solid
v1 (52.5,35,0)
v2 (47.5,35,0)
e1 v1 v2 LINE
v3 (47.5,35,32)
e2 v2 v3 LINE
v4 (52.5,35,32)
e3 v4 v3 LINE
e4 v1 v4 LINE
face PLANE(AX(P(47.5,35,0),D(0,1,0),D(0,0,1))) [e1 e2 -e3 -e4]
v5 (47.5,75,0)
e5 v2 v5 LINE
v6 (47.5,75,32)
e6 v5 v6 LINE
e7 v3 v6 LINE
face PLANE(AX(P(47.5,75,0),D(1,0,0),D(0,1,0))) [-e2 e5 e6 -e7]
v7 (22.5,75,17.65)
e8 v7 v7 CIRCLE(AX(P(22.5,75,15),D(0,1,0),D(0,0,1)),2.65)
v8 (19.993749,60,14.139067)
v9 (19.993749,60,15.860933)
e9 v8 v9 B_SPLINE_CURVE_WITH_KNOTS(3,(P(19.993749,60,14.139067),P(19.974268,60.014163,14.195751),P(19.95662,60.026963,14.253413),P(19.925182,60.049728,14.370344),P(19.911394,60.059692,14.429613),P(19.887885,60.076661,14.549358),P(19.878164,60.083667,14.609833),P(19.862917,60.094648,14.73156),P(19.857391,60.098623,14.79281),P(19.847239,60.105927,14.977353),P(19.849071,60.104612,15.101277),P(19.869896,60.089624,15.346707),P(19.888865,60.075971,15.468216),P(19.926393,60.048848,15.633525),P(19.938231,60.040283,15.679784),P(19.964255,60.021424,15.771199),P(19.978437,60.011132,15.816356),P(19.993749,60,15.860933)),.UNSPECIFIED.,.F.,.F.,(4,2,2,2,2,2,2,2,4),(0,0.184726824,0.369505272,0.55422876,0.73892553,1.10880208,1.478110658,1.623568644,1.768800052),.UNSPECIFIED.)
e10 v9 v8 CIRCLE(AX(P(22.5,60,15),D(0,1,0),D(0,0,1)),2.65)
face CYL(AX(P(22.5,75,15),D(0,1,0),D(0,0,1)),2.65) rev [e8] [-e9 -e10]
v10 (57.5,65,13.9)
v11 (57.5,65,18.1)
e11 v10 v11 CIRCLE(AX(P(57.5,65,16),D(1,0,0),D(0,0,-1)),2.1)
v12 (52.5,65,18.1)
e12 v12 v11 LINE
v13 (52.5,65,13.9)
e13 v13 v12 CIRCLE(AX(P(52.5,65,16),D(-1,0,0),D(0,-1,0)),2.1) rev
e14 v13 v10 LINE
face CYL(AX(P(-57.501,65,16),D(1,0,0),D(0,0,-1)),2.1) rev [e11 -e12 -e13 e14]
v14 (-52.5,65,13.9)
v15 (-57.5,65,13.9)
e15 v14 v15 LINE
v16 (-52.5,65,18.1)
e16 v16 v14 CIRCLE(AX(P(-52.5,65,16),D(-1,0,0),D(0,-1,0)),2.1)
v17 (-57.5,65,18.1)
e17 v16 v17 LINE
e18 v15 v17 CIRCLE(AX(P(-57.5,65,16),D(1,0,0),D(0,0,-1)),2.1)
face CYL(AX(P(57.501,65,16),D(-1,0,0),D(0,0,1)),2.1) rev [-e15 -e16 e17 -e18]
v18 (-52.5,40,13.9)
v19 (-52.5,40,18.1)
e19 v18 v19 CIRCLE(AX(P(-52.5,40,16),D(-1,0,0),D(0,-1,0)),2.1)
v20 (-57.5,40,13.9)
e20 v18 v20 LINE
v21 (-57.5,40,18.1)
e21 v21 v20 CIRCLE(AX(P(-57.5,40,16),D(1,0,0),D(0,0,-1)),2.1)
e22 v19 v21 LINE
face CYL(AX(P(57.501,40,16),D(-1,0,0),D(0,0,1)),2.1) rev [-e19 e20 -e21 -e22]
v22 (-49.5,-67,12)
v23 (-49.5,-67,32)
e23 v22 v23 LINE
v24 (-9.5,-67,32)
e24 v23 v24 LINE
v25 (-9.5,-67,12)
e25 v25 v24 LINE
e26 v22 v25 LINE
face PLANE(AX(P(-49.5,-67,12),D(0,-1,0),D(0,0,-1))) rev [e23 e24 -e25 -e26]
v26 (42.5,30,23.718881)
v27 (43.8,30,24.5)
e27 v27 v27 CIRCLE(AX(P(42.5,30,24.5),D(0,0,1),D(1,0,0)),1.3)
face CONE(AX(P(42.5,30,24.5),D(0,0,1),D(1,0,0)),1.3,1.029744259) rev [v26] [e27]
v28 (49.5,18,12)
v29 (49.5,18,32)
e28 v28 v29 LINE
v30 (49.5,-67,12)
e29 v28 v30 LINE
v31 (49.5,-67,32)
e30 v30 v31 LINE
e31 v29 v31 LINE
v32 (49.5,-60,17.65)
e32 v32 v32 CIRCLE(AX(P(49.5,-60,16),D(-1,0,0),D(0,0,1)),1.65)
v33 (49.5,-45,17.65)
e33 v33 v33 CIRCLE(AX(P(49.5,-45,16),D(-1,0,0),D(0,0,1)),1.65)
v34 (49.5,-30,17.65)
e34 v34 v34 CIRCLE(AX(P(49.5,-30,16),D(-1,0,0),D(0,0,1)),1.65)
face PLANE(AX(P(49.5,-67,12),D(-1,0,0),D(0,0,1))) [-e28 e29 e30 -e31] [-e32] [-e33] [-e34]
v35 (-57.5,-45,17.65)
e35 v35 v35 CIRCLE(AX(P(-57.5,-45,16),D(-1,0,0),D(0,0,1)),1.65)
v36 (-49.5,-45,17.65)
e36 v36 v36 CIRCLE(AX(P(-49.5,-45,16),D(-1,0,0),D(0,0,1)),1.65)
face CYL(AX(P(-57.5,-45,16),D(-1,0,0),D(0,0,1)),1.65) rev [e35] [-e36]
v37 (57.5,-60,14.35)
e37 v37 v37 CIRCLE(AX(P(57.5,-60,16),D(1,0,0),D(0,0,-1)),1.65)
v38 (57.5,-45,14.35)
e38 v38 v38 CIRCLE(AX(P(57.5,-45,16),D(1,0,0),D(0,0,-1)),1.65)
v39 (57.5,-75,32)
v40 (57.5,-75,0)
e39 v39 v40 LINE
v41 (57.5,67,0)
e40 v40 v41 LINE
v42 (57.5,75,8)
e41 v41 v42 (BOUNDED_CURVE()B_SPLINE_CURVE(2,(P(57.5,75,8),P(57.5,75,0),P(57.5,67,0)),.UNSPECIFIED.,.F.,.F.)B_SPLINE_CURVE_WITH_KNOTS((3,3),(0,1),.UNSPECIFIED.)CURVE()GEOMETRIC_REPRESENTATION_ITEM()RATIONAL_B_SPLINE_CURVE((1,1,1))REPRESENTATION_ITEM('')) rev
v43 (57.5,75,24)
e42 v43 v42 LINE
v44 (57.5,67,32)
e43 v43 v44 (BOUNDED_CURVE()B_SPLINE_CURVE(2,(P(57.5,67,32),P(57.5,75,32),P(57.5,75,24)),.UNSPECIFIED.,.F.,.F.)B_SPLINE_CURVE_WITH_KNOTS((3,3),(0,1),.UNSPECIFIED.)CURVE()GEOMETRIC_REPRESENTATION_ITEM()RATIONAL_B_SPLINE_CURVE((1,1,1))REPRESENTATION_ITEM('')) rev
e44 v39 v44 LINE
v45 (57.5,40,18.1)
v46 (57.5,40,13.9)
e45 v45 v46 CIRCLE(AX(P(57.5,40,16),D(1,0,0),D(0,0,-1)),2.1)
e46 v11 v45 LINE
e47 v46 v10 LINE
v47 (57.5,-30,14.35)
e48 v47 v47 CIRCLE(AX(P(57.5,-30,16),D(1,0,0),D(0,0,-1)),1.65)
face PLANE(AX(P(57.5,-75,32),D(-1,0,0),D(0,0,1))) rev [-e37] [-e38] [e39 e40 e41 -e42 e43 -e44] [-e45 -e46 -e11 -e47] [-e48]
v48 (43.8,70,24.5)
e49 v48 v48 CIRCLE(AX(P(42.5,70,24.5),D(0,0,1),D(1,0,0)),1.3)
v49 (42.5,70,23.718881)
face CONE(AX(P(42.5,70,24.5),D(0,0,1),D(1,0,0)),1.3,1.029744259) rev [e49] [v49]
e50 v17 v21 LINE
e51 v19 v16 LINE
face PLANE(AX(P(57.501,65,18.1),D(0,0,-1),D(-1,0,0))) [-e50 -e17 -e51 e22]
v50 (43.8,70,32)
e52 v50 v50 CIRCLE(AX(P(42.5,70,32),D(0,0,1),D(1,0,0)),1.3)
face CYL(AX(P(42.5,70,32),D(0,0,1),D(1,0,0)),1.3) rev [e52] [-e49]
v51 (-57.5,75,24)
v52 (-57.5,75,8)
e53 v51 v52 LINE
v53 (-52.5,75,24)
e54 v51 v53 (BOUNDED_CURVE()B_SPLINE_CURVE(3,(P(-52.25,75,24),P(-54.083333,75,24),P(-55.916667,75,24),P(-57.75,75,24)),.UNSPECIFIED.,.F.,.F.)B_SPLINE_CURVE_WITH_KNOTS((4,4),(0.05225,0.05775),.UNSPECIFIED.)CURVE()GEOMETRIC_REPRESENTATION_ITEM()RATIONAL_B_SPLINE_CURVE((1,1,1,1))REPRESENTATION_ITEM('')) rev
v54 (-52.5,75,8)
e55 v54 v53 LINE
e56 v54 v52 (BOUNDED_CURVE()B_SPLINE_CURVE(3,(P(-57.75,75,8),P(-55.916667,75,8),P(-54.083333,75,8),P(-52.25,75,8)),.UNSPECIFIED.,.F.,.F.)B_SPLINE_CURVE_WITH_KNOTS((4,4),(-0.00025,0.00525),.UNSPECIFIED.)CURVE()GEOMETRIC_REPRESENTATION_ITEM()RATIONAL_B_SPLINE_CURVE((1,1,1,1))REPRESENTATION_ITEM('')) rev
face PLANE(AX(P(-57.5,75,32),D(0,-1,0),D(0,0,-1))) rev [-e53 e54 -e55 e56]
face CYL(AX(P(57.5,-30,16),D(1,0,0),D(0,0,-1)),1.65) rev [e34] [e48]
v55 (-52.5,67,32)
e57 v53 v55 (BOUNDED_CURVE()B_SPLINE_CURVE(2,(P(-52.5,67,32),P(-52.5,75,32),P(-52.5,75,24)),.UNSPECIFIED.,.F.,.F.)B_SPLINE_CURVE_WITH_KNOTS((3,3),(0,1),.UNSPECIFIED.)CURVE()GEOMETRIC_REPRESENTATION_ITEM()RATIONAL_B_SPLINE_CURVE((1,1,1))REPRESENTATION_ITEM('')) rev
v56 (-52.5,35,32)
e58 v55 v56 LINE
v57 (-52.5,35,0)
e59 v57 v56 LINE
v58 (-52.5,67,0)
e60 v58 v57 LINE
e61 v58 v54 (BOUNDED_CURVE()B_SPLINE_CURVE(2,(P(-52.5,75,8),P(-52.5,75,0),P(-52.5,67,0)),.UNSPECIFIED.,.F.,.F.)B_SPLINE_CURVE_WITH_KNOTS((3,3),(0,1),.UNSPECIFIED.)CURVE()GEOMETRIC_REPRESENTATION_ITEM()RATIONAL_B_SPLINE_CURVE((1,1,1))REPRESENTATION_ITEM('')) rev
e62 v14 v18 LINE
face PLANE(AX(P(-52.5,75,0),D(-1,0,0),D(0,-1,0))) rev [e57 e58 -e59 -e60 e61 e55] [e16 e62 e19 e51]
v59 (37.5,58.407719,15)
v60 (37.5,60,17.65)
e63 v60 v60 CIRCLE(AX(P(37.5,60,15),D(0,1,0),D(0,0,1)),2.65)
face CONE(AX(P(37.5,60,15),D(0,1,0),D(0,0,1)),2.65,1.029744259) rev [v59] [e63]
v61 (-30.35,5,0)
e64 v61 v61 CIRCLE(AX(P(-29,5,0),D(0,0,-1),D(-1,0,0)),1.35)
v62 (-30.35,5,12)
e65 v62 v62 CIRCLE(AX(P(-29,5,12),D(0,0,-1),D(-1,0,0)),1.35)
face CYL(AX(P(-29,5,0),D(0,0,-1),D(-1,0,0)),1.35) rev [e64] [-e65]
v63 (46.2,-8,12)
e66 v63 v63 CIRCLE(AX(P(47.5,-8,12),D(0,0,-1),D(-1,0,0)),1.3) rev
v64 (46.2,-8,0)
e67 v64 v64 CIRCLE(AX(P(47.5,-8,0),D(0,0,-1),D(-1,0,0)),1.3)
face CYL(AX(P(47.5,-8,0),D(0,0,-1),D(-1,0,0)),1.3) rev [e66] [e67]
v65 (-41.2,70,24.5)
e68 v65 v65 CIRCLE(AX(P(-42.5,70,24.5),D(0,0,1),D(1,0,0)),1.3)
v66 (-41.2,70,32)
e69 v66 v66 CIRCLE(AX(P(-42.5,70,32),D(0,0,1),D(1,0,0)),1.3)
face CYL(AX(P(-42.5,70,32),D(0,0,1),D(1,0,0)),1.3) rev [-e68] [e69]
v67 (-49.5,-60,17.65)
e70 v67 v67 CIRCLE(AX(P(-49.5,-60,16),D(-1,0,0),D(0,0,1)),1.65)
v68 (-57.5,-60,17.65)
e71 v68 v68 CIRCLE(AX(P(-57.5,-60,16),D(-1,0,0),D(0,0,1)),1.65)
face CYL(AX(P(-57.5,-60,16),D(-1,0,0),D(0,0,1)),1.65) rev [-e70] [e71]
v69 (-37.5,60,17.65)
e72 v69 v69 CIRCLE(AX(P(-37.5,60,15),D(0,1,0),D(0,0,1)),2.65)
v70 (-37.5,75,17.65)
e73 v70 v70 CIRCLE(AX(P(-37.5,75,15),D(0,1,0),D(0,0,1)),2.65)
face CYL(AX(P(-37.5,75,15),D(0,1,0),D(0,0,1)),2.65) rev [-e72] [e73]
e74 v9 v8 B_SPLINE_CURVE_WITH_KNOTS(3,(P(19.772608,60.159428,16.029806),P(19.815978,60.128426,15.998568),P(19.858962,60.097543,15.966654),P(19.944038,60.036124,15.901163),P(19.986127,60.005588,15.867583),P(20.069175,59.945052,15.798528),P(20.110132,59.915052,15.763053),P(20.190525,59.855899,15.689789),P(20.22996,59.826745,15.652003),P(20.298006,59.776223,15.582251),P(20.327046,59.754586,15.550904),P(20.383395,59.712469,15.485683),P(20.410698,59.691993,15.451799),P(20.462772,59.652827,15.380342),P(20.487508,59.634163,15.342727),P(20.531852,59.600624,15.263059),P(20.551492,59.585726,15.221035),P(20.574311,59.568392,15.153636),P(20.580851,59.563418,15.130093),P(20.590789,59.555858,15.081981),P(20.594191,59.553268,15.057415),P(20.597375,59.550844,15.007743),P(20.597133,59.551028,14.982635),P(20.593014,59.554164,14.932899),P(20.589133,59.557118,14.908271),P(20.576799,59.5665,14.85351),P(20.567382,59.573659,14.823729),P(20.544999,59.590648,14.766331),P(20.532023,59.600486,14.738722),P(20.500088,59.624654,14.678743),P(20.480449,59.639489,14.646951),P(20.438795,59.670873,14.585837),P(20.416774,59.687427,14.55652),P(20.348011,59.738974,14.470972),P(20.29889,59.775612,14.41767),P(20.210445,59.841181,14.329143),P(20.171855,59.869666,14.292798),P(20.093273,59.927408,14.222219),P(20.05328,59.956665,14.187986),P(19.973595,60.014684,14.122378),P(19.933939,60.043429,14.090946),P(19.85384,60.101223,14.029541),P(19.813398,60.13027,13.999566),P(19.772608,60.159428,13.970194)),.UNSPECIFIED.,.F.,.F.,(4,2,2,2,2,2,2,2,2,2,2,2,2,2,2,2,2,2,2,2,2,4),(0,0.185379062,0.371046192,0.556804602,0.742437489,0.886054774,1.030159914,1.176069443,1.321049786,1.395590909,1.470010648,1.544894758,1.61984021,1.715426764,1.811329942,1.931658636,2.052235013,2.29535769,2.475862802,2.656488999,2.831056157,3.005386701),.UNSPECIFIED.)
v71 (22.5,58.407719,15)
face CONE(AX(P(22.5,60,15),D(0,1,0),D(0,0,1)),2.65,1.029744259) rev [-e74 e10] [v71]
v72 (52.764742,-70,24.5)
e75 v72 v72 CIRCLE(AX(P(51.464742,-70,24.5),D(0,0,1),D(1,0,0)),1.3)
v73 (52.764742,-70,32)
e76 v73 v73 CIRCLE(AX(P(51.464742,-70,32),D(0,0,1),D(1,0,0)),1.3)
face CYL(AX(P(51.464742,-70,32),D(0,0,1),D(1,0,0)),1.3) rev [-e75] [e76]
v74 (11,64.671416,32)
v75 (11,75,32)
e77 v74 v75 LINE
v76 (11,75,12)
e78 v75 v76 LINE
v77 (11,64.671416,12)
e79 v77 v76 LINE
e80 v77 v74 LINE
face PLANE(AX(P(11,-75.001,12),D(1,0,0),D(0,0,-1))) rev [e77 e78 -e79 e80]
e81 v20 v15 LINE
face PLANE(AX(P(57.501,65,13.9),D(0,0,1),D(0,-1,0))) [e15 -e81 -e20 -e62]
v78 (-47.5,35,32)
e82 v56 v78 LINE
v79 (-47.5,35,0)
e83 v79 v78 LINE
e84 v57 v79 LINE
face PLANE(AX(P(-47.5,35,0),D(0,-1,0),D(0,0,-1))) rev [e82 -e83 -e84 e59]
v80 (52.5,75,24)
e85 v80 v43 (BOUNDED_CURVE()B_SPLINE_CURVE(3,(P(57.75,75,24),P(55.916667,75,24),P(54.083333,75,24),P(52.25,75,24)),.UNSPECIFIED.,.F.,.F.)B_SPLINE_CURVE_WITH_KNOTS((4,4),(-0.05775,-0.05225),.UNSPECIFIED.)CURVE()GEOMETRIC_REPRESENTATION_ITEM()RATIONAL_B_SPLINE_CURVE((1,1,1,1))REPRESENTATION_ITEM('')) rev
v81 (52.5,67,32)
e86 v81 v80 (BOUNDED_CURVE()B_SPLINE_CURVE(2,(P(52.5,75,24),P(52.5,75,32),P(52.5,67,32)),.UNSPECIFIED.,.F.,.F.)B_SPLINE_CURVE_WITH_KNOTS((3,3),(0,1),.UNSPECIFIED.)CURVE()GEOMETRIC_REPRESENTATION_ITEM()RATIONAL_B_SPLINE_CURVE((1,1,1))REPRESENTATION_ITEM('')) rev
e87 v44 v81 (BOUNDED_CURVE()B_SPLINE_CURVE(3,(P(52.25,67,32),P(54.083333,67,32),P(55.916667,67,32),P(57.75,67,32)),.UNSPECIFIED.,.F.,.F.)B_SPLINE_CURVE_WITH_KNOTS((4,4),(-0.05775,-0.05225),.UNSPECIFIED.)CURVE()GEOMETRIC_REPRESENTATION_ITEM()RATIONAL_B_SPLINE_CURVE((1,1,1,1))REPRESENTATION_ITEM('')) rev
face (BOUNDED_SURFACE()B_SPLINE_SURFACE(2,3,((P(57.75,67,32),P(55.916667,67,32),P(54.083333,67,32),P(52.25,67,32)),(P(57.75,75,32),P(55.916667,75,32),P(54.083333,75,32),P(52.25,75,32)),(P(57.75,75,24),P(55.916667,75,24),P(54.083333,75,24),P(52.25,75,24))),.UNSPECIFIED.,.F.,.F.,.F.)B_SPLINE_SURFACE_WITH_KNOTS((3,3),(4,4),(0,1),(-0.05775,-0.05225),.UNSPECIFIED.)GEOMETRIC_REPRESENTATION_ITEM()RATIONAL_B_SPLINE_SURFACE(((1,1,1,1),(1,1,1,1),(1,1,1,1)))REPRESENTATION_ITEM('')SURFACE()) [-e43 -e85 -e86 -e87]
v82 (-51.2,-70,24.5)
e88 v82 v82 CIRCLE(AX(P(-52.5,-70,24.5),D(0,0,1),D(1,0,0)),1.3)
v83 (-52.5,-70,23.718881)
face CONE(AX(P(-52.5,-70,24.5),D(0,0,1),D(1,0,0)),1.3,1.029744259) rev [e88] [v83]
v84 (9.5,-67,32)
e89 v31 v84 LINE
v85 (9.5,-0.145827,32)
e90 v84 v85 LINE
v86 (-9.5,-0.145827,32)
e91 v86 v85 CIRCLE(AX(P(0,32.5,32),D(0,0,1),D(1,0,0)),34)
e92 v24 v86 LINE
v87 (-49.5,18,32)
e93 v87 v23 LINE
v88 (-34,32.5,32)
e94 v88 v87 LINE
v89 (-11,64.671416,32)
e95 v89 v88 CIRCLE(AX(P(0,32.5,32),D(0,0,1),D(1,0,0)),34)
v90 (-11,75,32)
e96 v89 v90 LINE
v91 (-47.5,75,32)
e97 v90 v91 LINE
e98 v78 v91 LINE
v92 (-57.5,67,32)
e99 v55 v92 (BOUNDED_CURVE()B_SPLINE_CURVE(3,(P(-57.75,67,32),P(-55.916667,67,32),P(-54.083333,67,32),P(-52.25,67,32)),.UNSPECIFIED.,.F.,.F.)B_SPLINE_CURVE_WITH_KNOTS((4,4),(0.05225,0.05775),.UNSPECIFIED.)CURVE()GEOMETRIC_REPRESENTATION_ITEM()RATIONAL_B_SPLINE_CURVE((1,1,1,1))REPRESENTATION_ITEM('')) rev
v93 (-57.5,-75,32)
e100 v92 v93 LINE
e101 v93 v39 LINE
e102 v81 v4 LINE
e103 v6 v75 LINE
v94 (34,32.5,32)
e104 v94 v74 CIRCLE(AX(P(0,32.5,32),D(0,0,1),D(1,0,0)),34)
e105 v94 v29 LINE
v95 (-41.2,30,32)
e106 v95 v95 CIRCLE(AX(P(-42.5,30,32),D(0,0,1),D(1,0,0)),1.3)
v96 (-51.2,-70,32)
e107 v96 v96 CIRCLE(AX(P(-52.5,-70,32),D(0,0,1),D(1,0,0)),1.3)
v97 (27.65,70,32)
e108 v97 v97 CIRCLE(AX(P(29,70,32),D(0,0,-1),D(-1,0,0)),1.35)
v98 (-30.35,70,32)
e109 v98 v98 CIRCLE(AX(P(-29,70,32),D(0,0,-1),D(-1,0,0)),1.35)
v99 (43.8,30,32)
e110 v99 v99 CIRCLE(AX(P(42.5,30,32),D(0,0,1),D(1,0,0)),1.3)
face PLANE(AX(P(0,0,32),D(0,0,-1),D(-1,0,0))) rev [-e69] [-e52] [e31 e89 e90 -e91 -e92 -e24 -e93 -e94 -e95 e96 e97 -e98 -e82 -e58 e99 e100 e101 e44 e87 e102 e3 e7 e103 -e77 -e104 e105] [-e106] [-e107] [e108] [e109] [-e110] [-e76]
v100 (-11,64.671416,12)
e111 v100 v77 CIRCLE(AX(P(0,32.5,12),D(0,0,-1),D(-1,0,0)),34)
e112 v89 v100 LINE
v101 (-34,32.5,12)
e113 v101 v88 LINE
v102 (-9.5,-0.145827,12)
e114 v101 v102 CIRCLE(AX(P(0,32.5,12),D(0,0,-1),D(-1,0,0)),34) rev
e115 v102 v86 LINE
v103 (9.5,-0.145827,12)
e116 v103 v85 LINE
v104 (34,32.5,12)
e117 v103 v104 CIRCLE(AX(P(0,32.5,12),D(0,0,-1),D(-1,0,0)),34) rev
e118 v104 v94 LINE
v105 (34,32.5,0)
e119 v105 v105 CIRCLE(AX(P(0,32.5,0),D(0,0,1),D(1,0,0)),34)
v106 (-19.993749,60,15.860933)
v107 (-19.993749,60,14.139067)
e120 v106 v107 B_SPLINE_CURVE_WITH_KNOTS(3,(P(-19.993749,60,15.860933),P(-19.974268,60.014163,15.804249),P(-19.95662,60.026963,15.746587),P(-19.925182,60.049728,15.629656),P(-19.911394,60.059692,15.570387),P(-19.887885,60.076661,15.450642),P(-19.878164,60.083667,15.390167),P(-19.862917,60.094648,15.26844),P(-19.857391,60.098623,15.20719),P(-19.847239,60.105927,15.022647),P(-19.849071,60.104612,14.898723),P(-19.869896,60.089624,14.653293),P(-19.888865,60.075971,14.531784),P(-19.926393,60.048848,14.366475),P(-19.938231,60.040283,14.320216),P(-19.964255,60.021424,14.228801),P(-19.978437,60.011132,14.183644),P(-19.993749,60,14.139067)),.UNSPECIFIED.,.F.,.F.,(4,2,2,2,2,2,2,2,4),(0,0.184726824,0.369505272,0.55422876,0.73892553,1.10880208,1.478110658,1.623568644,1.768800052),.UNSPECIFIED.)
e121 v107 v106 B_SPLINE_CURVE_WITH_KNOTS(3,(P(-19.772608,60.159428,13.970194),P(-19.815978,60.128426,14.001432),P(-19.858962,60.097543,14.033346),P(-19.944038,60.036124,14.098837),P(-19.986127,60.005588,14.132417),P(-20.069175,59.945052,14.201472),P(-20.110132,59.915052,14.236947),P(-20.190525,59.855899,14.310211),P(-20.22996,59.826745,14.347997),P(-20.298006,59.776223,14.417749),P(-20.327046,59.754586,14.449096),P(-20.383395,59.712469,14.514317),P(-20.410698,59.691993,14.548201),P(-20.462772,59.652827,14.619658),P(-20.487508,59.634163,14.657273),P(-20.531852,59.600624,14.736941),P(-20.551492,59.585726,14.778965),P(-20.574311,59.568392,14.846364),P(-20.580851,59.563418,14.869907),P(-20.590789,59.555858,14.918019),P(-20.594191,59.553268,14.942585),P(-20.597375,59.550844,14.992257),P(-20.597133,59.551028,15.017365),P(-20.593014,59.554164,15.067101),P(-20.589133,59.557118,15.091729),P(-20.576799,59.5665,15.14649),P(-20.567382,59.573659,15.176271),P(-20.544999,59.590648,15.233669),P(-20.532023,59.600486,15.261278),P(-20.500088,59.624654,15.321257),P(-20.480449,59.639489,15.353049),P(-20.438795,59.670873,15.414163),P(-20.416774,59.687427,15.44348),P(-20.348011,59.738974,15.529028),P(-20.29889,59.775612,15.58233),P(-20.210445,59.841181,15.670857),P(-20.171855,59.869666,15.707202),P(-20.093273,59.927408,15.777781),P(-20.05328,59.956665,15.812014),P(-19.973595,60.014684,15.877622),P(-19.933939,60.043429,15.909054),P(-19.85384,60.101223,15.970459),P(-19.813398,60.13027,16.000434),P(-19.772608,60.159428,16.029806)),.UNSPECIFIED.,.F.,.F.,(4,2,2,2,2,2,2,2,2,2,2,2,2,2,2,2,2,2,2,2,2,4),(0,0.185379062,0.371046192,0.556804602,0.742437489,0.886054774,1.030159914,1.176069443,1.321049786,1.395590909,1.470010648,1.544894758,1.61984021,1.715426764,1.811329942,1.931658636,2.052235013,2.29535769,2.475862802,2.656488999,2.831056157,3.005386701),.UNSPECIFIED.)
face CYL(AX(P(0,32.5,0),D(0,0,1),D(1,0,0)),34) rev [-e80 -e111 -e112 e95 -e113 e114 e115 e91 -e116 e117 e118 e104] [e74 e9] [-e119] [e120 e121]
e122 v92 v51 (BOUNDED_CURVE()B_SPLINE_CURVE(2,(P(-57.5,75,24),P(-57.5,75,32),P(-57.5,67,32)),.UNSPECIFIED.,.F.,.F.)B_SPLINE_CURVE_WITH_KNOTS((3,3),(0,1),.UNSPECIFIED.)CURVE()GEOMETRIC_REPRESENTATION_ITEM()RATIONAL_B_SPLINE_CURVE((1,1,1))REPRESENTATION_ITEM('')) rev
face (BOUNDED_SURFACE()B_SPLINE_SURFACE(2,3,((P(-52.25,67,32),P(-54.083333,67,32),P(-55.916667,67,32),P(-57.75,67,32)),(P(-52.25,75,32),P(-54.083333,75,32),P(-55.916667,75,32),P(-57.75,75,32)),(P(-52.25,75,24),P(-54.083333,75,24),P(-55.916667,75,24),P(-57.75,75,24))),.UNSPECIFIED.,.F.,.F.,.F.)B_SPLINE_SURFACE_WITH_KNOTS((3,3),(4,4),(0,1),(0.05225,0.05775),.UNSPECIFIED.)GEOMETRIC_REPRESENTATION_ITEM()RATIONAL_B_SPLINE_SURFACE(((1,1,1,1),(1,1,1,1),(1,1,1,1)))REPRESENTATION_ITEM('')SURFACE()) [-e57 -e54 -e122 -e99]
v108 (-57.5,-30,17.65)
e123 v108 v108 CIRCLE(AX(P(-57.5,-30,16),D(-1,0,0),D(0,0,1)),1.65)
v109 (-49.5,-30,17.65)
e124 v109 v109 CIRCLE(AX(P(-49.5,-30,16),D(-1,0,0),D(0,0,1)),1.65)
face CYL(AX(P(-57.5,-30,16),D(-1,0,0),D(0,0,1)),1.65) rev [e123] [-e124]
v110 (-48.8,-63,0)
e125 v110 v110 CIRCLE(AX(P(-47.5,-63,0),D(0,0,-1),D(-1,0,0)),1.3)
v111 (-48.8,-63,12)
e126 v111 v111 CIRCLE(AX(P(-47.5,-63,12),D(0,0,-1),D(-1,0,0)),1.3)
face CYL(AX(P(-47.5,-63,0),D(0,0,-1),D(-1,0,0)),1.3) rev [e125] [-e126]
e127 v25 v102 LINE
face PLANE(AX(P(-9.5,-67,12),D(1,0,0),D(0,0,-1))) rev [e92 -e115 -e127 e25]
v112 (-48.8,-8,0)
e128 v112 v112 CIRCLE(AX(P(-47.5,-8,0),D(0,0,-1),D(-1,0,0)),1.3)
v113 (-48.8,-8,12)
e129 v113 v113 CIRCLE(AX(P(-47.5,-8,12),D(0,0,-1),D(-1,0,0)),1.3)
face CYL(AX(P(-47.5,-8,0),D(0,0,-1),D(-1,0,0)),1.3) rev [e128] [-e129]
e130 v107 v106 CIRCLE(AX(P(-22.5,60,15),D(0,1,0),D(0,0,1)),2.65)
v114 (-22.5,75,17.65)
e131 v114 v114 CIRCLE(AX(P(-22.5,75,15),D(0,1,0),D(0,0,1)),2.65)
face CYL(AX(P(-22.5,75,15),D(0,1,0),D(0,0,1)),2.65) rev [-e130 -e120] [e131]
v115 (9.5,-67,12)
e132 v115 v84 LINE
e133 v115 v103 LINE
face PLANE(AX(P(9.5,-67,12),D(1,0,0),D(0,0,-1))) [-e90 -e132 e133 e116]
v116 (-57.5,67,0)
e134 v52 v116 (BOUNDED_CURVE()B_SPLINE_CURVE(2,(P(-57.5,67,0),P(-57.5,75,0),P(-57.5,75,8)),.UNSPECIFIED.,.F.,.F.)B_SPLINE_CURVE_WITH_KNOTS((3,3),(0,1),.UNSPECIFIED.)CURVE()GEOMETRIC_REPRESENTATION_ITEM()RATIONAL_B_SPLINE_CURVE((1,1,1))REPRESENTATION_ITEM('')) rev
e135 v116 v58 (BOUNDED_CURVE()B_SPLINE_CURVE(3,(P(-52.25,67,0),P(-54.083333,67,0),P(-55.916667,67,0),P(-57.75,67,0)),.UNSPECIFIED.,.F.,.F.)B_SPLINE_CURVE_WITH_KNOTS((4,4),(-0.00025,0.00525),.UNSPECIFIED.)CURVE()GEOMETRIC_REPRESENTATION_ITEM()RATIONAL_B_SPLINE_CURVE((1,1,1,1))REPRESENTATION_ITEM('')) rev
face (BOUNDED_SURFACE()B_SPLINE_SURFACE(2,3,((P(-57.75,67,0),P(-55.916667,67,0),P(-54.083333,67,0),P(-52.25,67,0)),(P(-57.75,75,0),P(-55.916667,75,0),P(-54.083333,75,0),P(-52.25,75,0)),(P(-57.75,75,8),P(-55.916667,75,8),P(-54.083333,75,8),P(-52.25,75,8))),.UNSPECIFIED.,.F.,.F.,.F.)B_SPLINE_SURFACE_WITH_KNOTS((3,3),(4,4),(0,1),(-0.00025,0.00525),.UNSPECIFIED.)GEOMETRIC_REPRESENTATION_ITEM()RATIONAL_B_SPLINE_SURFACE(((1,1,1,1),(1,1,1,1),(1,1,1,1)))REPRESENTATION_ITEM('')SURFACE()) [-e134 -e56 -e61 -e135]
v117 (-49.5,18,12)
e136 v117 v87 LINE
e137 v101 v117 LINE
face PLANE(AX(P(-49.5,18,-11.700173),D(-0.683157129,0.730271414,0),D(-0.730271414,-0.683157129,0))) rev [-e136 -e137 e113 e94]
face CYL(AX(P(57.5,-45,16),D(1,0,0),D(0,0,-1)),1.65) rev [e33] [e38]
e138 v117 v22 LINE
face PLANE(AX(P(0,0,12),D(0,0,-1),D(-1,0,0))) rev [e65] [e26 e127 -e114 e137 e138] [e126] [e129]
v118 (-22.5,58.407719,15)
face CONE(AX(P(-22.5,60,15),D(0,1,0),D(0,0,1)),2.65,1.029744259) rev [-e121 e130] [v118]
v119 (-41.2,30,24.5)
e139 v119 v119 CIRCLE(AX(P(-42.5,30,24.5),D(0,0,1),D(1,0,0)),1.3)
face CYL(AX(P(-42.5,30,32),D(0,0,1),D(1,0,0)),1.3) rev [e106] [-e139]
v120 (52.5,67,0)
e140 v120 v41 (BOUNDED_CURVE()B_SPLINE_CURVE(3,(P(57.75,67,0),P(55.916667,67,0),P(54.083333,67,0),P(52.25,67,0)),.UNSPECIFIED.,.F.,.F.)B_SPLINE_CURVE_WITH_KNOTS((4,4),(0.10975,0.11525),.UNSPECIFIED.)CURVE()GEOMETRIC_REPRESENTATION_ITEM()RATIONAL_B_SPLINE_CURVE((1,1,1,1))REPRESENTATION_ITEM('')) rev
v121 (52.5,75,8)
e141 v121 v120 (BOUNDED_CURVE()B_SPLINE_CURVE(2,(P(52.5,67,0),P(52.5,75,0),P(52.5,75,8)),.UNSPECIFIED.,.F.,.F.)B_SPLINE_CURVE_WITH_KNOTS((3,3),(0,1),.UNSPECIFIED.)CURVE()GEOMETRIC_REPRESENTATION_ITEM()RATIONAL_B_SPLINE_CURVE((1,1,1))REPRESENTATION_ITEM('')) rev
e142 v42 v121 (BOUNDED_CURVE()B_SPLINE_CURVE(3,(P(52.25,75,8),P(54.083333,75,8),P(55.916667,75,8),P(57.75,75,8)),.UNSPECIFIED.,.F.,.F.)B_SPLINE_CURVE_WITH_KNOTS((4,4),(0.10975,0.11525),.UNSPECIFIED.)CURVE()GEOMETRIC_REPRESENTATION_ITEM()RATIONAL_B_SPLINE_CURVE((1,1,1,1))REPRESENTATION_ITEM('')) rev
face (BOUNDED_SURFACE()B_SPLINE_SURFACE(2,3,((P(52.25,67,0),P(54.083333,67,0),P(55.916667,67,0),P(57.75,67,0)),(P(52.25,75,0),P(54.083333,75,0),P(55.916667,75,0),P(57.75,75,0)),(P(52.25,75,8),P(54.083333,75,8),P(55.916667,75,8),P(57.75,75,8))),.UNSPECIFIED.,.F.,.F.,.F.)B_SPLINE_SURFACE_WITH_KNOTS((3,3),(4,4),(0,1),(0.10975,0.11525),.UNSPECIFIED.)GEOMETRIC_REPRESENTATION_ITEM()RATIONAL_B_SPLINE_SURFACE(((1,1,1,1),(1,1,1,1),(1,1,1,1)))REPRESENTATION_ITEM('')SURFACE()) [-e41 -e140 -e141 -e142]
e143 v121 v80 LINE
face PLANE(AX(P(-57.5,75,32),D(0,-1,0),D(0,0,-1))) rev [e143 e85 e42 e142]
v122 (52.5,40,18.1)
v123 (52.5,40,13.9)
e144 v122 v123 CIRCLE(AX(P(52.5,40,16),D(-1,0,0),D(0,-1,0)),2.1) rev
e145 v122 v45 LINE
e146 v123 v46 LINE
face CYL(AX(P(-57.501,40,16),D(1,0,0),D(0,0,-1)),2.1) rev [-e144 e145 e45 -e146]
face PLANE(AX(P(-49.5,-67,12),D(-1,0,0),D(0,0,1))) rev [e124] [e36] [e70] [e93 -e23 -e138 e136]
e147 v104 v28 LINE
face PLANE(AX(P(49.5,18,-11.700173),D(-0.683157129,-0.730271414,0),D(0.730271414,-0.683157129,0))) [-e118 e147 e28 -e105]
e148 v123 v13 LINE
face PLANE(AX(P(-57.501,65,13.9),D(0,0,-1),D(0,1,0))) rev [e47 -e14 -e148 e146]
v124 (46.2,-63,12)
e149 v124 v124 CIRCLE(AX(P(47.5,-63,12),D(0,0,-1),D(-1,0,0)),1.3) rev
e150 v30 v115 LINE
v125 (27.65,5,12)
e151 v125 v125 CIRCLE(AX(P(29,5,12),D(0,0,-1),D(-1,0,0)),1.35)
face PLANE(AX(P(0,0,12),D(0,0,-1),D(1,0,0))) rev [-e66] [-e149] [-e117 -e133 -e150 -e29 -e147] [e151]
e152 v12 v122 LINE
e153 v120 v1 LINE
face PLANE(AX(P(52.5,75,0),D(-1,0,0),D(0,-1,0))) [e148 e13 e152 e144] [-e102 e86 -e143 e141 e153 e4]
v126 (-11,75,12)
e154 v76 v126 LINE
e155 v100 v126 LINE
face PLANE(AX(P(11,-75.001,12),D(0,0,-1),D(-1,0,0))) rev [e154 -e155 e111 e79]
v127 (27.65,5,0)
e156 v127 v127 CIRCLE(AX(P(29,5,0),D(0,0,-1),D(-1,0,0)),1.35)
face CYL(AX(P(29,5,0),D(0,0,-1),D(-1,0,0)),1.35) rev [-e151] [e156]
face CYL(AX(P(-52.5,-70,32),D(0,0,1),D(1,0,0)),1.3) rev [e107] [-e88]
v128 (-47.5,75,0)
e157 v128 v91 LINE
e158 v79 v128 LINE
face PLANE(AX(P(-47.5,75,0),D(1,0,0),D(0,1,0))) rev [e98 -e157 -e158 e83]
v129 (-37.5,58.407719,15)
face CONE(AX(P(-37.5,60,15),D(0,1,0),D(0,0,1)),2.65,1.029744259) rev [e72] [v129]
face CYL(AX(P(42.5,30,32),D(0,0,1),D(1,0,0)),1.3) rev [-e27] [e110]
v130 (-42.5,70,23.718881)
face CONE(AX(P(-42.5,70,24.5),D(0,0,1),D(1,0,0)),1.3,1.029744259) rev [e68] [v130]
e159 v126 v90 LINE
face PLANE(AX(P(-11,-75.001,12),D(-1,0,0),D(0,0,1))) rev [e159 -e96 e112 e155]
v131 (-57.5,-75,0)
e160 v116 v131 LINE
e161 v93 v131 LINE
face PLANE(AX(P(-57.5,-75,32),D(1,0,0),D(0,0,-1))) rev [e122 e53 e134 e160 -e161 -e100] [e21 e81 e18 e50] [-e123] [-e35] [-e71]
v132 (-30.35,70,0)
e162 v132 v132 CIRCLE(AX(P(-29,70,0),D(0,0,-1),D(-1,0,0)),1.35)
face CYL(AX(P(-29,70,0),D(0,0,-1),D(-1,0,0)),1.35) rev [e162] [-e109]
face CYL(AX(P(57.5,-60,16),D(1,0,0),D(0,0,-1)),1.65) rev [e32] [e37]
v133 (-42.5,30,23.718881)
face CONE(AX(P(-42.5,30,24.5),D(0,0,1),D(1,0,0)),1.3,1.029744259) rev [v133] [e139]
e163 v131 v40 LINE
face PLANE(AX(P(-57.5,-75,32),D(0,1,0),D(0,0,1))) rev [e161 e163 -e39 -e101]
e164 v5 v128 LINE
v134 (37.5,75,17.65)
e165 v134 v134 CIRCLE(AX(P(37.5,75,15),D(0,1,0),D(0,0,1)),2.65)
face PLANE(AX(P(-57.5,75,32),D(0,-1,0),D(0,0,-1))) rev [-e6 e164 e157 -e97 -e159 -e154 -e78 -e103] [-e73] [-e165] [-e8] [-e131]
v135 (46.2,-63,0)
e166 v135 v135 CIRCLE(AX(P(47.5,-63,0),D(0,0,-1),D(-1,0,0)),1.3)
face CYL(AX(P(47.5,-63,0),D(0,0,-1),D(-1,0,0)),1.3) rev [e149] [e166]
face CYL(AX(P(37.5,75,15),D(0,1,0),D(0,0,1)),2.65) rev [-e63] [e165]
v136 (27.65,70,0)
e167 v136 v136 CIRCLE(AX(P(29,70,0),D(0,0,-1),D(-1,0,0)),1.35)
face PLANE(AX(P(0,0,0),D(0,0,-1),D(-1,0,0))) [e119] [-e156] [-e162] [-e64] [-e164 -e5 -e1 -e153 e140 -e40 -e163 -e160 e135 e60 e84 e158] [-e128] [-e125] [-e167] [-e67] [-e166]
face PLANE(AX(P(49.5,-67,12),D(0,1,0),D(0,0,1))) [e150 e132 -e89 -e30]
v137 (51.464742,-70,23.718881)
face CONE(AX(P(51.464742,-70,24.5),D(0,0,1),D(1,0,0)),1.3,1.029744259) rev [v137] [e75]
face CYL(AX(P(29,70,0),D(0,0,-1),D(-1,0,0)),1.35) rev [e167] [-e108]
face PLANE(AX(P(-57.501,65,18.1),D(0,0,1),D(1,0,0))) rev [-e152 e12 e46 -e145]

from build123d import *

# Parameters (mm, degrees)
SKETCH_1_W               = 115
SKETCH_1_H               = 150
EXTRUDE_1_DEPTH          = 32
SKETCH_2_R               = 34
CUT_EXTRUDE_1_DEPTH      = 100.775999118
SKETCH_3_W               = 40
SKETCH_3_H               = 85
CUT_EXTRUDE_2_DEPTH      = 20
F_1_0MM_2_D              = 2.6
SKETCH_8_W               = 5
SKETCH_8_H               = 40
CUT_EXTRUDE_3_DEPTH      = 100.775999118
CUT_EXTRUDE_4_REACH      = 165.799
CUT_EXTRUDE_4_END_RADIUS = 34
SKETCH_9_W               = 22
SKETCH_9_H               = 20
CUT_EXTRUDE_5_REACH      = 142.975
FILLET_1_SIZE            = 8
F_1_0MM_4_AT_2_COUNT     = 2
F_1_0MM_4_AT_2_PITCH     = 15
F_1_0MM_3_D              = 2.6
F_1_0MM_3_DEPTH          = 7.5
F_1_0MM_3_TIP            = 0.781118805
CUT_EXTRUDE_7_DEPTH      = 20
F_1_0MM_5_REACH          = 142.975
F_1_0MM_5_BORE_R         = 1.65
F_1_0MM_6_D              = 2.7


with BuildPart() as part:
    # 草圖1 → 填料-伸長1 (new body)
    with BuildSketch(Plane.XY):
        Rectangle(SKETCH_1_W, SKETCH_1_H)
    extrude(amount=EXTRUDE_1_DEPTH)

    # 草圖2 → 除料-伸長1 (cut, through all)
    with BuildSketch(Plane.XY.offset(32)):
        with Locations((0, 32.5)):
            Circle(SKETCH_2_R)
    extrude(amount=-CUT_EXTRUDE_1_DEPTH, mode=Mode.SUBTRACT)

    # 草圖3 → 除料-伸長2 (cut)
    with BuildSketch(Plane.XY.offset(32)):
        with Locations((-29.5, -24.5)):
            Rectangle(SKETCH_3_W, SKETCH_3_H)
    cut_extrude_2 = extrude(amount=-CUT_EXTRUDE_2_DEPTH, mode=Mode.SUBTRACT)

    # 鏡射1: 除料-伸長2 across plane
    add(cut_extrude_2.mirror(Plane(origin=(0, 0, 0), x_dir=(0, 0, 1), z_dir=(1, 0, 0))), mode=Mode.SUBTRACT)

    # Ø1.0mm 定位孔2 (through all)
    with Locations(Plane(origin=(0, 0, 0), x_dir=(-1, 0, 0), z_dir=(0, 0, -1))):
        with Locations((47.5, -8), (47.5, -63), (-47.5, -8), (-47.5, -63)):
            Hole(F_1_0MM_2_D / 2)

    # 草圖8 → 除料-伸長3 (cut, through all)
    with BuildSketch(Plane.XY.offset(32)):
        with Locations((-50, 55)):
            Rectangle(SKETCH_8_W, SKETCH_8_H)
    cut_extrude_3 = extrude(amount=-CUT_EXTRUDE_3_DEPTH, mode=Mode.SUBTRACT)

    # 鏡射2: 除料-伸長3 across plane
    add(cut_extrude_3.mirror(Plane(origin=(0, 0, 0), x_dir=(0, 0, 1), z_dir=(1, 0, 0))), mode=Mode.SUBTRACT)

    # 除料-伸長4: up to this cylinder (the profile starts outside it)
    cut_extrude_4_end = Plane(origin=(0, 32.5, 22), z_dir=(0, 0, 1)) * Cylinder(CUT_EXTRUDE_4_END_RADIUS, 400.598, mode=Mode.PRIVATE)
    # 草圖9 → 除料-伸長4 (cut, up to the surface)
    with BuildSketch(Plane(origin=(0, 75, 0), x_dir=(1, 0, 0), z_dir=(0, 1, 0)), mode=Mode.PRIVATE) as cut_extrude_4_sk1:
        with Locations((0, -22)):
            Rectangle(SKETCH_9_W, SKETCH_9_H)
    cut_extrude_4_tool1 = extrude(cut_extrude_4_sk1.sketch, amount=-CUT_EXTRUDE_4_REACH, mode=Mode.PRIVATE) - cut_extrude_4_end
    add(cut_extrude_4_tool1.solids().sort_by_distance((0, 75, 22))[0], mode=Mode.SUBTRACT)

    # 草圖11 → 除料-伸長5 (cut, up to next)
    with BuildSketch(Plane(origin=(57.5, 0, 0), x_dir=(0, 0, -1), z_dir=(1, 0, 0)), mode=Mode.PRIVATE) as cut_extrude_5_sk1:
        with BuildLine():
            Line((-13.9, 65), (-13.9, 40))
            ThreePointArc((-13.9, 40), (-16, 37.9), (-18.1, 40))
            Line((-18.1, 40), (-18.1, 65))
            ThreePointArc((-18.1, 65), (-16, 67.1), (-13.9, 65))
        make_face()
    cut_extrude_5_tool1 = extrude(cut_extrude_5_sk1.sketch, amount=-CUT_EXTRUDE_5_REACH, mode=Mode.PRIVATE) & part.part
    cut_extrude_5 = cut_extrude_5_tool1.solids().sort_by_distance((57.5, 52.5, 16))[0]
    add(cut_extrude_5, mode=Mode.SUBTRACT)

    # 鏡射3: 除料-伸長5 across plane
    add(cut_extrude_5.mirror(Plane(origin=(0, 0, 0), x_dir=(0, 0, 1), z_dir=(1, 0, 0))), mode=Mode.SUBTRACT)

    # 圓角1
    # a fillet whose section is not a circle: 8 mm, written as the material it takes off along each edge
    with BuildSketch(Plane(origin=(-32.5, 75, 32), x_dir=(0, -1, 0), z_dir=(-1, 0, 0))) as fillet_1_piece_1_section:
        with BuildLine():
            Bezier((FILLET_1_SIZE, 0), (0, 0), (0, -FILLET_1_SIZE), weights=[1, 1, 1])
            Line((0, -FILLET_1_SIZE), (0, 0))
            Line((0, 0), (FILLET_1_SIZE, 0))
        make_face()
    fillet_1_piece_1 = extrude(amount=45, mode=Mode.PRIVATE)
    fillet_1_piece_1 = split(fillet_1_piece_1, bisect_by=Plane(origin=(-47.5, 75, 32), z_dir=(-1, 0, 0)), keep=Keep.TOP, mode=Mode.PRIVATE)
    add(fillet_1_piece_1, mode=Mode.SUBTRACT)
    with BuildSketch(Plane(origin=(-32.5, 75, 0), x_dir=(0, -1, 0), z_dir=(-1, 0, 0))) as fillet_1_piece_2_section:
        with BuildLine():
            Bezier((FILLET_1_SIZE, 0), (0, 0), (0, FILLET_1_SIZE), weights=[1, 1, 1])
            Line((0, FILLET_1_SIZE), (0, 0))
            Line((0, 0), (FILLET_1_SIZE, 0))
        make_face()
    fillet_1_piece_2 = extrude(amount=45, mode=Mode.PRIVATE)
    fillet_1_piece_2 = split(fillet_1_piece_2, bisect_by=Plane(origin=(-47.5, 75, 0), z_dir=(-1, 0, 0)), keep=Keep.TOP, mode=Mode.PRIVATE)
    add(fillet_1_piece_2, mode=Mode.SUBTRACT)
    with BuildSketch(Plane(origin=(77.5, 75, 0), x_dir=(0, -1, 0), z_dir=(-1, 0, 0))) as fillet_1_piece_3:
        with BuildLine():
            Bezier((FILLET_1_SIZE, 0), (0, 0), (0, FILLET_1_SIZE), weights=[1, 1, 1])
            Line((0, FILLET_1_SIZE), (0, 0))
            Line((0, 0), (FILLET_1_SIZE, 0))
        make_face()
    extrude(amount=25, mode=Mode.SUBTRACT)
    with BuildSketch(Plane(origin=(77.5, 75, 32), x_dir=(0, -1, 0), z_dir=(-1, 0, 0))) as fillet_1_piece_4:
        with BuildLine():
            Bezier((FILLET_1_SIZE, 0), (0, 0), (0, -FILLET_1_SIZE), weights=[1, 1, 1])
            Line((0, -FILLET_1_SIZE), (0, 0))
            Line((0, 0), (FILLET_1_SIZE, 0))
        make_face()
    extrude(amount=25, mode=Mode.SUBTRACT)

    # 草圖13 → Ø1.0mm 定位孔4 (revolve, cut)
    with BuildSketch(Plane(origin=(-37.5, 75, 15), x_dir=(0, 0, 1), z_dir=(1, 0, 0))):
        Polygon((0, 0), (0, 16.59228064), (2.65, 15), (2.65, 0), align=None)
    f_1_0mm_4 = revolve(axis=Axis((-37.5, 81.35, 15), (0, -1, 0)), mode=Mode.SUBTRACT)

    # Ø1.0mm 定位孔4 at 2: Ø1.0mm 定位孔4 ×2
    with Locations(*[(i * F_1_0MM_4_AT_2_PITCH, 0, 0) for i in range(1, F_1_0MM_4_AT_2_COUNT)]):
        add(f_1_0mm_4, mode=Mode.SUBTRACT)

    # 鏡射4: Ø1.0mm 定位孔4 across plane
    add(f_1_0mm_4.mirror(Plane(origin=(0, 0, 0), x_dir=(0, 0, 1), z_dir=(1, 0, 0))), mode=Mode.SUBTRACT)

    # 鏡射4 copy 1 sketch → 鏡射4 copy 1 (revolve, cut)
    with BuildSketch(Plane(origin=(22.5, 75, 15), x_dir=(0, 0, 1), z_dir=(-1, 0, 0))):
        Polygon((0, 0), (0, -16.59228064), (2.65, -15), (2.65, 0), align=None)
    revolve(axis=Axis((22.5, 81.35, 15), (0, 1, 0)), mode=Mode.SUBTRACT)

    # Ø1.0mm 定位孔3
    with Locations(Plane.XY.offset(32)):
        with Locations((-52.5, -70), (51.464741732, -70), (-42.5, 70), (-42.5, 30), (42.5, 70), (42.5, 30)):
            Hole(F_1_0MM_3_D / 2, depth=F_1_0MM_3_DEPTH)
            with Locations((0, 0, -(F_1_0MM_3_DEPTH + F_1_0MM_3_TIP / 2))):  # 118° drill point
                Cone(0, F_1_0MM_3_D / 2, F_1_0MM_3_TIP, mode=Mode.SUBTRACT)

    # 草圖17 → 除料-伸長7 (cut)
    with BuildSketch(Plane.XY.offset(32)):
        with BuildLine():
            Line((-49.5, 18), (-34, 32.5))
            ThreePointArc((-34, 32.5), (-33.178333694, 25.070452685), (-30.753048629, 18))
            Line((-30.753048629, 18), (-49.5, 18))
        make_face()
    cut_extrude_7 = extrude(amount=-CUT_EXTRUDE_7_DEPTH, mode=Mode.SUBTRACT)

    # Ø1.0mm 定位孔5 bore → Ø1.0mm 定位孔5 (cut, up to next)
    with BuildSketch(Plane.ZY.offset(57.5), mode=Mode.PRIVATE) as f_1_0mm_5_sk1:
        with Locations((16, -60)):
            Circle(F_1_0MM_5_BORE_R)
    f_1_0mm_5_tool1 = extrude(f_1_0mm_5_sk1.sketch, amount=-F_1_0MM_5_REACH, mode=Mode.PRIVATE) & part.part
    # Ø1.0mm 定位孔5 bore → Ø1.0mm 定位孔5 (cut, up to next)
    with BuildSketch(Plane.ZY.offset(57.5), mode=Mode.PRIVATE) as f_1_0mm_5_sk2:
        with Locations((16, -45)):
            Circle(F_1_0MM_5_BORE_R)
    f_1_0mm_5_tool2 = extrude(f_1_0mm_5_sk2.sketch, amount=-F_1_0MM_5_REACH, mode=Mode.PRIVATE) & part.part
    # Ø1.0mm 定位孔5 bore → Ø1.0mm 定位孔5 (cut, up to next)
    with BuildSketch(Plane.ZY.offset(57.5), mode=Mode.PRIVATE) as f_1_0mm_5_sk3:
        with Locations((16, -30)):
            Circle(F_1_0MM_5_BORE_R)
    f_1_0mm_5_tool3 = extrude(f_1_0mm_5_sk3.sketch, amount=-F_1_0MM_5_REACH, mode=Mode.PRIVATE) & part.part
    f_1_0mm_5_1 = f_1_0mm_5_tool1.solids().sort_by_distance((-57.5, -60, 16))[0]
    add(f_1_0mm_5_1, mode=Mode.SUBTRACT)
    f_1_0mm_5_2 = f_1_0mm_5_tool2.solids().sort_by_distance((-57.5, -45, 16))[0]
    add(f_1_0mm_5_2, mode=Mode.SUBTRACT)
    f_1_0mm_5_3 = f_1_0mm_5_tool3.solids().sort_by_distance((-57.5, -30, 16))[0]
    add(f_1_0mm_5_3, mode=Mode.SUBTRACT)
    f_1_0mm_5 = f_1_0mm_5_1 + f_1_0mm_5_2 + f_1_0mm_5_3  # Ø1.0mm 定位孔5 as one shape, for the pattern or mirror that repeats it

    # 鏡射5: Ø1.0mm 定位孔5 across plane
    add(f_1_0mm_5.mirror(Plane(origin=(0, 0, 0), x_dir=(0, 0, 1), z_dir=(1, 0, 0))), mode=Mode.SUBTRACT)

    # 鏡射6: 除料-伸長7 across plane
    add(cut_extrude_7.mirror(Plane(origin=(0, 0, 0), x_dir=(0, 0, 1), z_dir=(1, 0, 0))), mode=Mode.SUBTRACT)

    # Ø1.0mm 定位孔6 (through all)
    with Locations(Plane(origin=(0, 0, 0), x_dir=(-1, 0, 0), z_dir=(0, 0, -1))):
        with Locations((-29, 70), (-29, 5), (29, 70), (29, 5)):
            Hole(F_1_0MM_6_D / 2)


solid = part.part
